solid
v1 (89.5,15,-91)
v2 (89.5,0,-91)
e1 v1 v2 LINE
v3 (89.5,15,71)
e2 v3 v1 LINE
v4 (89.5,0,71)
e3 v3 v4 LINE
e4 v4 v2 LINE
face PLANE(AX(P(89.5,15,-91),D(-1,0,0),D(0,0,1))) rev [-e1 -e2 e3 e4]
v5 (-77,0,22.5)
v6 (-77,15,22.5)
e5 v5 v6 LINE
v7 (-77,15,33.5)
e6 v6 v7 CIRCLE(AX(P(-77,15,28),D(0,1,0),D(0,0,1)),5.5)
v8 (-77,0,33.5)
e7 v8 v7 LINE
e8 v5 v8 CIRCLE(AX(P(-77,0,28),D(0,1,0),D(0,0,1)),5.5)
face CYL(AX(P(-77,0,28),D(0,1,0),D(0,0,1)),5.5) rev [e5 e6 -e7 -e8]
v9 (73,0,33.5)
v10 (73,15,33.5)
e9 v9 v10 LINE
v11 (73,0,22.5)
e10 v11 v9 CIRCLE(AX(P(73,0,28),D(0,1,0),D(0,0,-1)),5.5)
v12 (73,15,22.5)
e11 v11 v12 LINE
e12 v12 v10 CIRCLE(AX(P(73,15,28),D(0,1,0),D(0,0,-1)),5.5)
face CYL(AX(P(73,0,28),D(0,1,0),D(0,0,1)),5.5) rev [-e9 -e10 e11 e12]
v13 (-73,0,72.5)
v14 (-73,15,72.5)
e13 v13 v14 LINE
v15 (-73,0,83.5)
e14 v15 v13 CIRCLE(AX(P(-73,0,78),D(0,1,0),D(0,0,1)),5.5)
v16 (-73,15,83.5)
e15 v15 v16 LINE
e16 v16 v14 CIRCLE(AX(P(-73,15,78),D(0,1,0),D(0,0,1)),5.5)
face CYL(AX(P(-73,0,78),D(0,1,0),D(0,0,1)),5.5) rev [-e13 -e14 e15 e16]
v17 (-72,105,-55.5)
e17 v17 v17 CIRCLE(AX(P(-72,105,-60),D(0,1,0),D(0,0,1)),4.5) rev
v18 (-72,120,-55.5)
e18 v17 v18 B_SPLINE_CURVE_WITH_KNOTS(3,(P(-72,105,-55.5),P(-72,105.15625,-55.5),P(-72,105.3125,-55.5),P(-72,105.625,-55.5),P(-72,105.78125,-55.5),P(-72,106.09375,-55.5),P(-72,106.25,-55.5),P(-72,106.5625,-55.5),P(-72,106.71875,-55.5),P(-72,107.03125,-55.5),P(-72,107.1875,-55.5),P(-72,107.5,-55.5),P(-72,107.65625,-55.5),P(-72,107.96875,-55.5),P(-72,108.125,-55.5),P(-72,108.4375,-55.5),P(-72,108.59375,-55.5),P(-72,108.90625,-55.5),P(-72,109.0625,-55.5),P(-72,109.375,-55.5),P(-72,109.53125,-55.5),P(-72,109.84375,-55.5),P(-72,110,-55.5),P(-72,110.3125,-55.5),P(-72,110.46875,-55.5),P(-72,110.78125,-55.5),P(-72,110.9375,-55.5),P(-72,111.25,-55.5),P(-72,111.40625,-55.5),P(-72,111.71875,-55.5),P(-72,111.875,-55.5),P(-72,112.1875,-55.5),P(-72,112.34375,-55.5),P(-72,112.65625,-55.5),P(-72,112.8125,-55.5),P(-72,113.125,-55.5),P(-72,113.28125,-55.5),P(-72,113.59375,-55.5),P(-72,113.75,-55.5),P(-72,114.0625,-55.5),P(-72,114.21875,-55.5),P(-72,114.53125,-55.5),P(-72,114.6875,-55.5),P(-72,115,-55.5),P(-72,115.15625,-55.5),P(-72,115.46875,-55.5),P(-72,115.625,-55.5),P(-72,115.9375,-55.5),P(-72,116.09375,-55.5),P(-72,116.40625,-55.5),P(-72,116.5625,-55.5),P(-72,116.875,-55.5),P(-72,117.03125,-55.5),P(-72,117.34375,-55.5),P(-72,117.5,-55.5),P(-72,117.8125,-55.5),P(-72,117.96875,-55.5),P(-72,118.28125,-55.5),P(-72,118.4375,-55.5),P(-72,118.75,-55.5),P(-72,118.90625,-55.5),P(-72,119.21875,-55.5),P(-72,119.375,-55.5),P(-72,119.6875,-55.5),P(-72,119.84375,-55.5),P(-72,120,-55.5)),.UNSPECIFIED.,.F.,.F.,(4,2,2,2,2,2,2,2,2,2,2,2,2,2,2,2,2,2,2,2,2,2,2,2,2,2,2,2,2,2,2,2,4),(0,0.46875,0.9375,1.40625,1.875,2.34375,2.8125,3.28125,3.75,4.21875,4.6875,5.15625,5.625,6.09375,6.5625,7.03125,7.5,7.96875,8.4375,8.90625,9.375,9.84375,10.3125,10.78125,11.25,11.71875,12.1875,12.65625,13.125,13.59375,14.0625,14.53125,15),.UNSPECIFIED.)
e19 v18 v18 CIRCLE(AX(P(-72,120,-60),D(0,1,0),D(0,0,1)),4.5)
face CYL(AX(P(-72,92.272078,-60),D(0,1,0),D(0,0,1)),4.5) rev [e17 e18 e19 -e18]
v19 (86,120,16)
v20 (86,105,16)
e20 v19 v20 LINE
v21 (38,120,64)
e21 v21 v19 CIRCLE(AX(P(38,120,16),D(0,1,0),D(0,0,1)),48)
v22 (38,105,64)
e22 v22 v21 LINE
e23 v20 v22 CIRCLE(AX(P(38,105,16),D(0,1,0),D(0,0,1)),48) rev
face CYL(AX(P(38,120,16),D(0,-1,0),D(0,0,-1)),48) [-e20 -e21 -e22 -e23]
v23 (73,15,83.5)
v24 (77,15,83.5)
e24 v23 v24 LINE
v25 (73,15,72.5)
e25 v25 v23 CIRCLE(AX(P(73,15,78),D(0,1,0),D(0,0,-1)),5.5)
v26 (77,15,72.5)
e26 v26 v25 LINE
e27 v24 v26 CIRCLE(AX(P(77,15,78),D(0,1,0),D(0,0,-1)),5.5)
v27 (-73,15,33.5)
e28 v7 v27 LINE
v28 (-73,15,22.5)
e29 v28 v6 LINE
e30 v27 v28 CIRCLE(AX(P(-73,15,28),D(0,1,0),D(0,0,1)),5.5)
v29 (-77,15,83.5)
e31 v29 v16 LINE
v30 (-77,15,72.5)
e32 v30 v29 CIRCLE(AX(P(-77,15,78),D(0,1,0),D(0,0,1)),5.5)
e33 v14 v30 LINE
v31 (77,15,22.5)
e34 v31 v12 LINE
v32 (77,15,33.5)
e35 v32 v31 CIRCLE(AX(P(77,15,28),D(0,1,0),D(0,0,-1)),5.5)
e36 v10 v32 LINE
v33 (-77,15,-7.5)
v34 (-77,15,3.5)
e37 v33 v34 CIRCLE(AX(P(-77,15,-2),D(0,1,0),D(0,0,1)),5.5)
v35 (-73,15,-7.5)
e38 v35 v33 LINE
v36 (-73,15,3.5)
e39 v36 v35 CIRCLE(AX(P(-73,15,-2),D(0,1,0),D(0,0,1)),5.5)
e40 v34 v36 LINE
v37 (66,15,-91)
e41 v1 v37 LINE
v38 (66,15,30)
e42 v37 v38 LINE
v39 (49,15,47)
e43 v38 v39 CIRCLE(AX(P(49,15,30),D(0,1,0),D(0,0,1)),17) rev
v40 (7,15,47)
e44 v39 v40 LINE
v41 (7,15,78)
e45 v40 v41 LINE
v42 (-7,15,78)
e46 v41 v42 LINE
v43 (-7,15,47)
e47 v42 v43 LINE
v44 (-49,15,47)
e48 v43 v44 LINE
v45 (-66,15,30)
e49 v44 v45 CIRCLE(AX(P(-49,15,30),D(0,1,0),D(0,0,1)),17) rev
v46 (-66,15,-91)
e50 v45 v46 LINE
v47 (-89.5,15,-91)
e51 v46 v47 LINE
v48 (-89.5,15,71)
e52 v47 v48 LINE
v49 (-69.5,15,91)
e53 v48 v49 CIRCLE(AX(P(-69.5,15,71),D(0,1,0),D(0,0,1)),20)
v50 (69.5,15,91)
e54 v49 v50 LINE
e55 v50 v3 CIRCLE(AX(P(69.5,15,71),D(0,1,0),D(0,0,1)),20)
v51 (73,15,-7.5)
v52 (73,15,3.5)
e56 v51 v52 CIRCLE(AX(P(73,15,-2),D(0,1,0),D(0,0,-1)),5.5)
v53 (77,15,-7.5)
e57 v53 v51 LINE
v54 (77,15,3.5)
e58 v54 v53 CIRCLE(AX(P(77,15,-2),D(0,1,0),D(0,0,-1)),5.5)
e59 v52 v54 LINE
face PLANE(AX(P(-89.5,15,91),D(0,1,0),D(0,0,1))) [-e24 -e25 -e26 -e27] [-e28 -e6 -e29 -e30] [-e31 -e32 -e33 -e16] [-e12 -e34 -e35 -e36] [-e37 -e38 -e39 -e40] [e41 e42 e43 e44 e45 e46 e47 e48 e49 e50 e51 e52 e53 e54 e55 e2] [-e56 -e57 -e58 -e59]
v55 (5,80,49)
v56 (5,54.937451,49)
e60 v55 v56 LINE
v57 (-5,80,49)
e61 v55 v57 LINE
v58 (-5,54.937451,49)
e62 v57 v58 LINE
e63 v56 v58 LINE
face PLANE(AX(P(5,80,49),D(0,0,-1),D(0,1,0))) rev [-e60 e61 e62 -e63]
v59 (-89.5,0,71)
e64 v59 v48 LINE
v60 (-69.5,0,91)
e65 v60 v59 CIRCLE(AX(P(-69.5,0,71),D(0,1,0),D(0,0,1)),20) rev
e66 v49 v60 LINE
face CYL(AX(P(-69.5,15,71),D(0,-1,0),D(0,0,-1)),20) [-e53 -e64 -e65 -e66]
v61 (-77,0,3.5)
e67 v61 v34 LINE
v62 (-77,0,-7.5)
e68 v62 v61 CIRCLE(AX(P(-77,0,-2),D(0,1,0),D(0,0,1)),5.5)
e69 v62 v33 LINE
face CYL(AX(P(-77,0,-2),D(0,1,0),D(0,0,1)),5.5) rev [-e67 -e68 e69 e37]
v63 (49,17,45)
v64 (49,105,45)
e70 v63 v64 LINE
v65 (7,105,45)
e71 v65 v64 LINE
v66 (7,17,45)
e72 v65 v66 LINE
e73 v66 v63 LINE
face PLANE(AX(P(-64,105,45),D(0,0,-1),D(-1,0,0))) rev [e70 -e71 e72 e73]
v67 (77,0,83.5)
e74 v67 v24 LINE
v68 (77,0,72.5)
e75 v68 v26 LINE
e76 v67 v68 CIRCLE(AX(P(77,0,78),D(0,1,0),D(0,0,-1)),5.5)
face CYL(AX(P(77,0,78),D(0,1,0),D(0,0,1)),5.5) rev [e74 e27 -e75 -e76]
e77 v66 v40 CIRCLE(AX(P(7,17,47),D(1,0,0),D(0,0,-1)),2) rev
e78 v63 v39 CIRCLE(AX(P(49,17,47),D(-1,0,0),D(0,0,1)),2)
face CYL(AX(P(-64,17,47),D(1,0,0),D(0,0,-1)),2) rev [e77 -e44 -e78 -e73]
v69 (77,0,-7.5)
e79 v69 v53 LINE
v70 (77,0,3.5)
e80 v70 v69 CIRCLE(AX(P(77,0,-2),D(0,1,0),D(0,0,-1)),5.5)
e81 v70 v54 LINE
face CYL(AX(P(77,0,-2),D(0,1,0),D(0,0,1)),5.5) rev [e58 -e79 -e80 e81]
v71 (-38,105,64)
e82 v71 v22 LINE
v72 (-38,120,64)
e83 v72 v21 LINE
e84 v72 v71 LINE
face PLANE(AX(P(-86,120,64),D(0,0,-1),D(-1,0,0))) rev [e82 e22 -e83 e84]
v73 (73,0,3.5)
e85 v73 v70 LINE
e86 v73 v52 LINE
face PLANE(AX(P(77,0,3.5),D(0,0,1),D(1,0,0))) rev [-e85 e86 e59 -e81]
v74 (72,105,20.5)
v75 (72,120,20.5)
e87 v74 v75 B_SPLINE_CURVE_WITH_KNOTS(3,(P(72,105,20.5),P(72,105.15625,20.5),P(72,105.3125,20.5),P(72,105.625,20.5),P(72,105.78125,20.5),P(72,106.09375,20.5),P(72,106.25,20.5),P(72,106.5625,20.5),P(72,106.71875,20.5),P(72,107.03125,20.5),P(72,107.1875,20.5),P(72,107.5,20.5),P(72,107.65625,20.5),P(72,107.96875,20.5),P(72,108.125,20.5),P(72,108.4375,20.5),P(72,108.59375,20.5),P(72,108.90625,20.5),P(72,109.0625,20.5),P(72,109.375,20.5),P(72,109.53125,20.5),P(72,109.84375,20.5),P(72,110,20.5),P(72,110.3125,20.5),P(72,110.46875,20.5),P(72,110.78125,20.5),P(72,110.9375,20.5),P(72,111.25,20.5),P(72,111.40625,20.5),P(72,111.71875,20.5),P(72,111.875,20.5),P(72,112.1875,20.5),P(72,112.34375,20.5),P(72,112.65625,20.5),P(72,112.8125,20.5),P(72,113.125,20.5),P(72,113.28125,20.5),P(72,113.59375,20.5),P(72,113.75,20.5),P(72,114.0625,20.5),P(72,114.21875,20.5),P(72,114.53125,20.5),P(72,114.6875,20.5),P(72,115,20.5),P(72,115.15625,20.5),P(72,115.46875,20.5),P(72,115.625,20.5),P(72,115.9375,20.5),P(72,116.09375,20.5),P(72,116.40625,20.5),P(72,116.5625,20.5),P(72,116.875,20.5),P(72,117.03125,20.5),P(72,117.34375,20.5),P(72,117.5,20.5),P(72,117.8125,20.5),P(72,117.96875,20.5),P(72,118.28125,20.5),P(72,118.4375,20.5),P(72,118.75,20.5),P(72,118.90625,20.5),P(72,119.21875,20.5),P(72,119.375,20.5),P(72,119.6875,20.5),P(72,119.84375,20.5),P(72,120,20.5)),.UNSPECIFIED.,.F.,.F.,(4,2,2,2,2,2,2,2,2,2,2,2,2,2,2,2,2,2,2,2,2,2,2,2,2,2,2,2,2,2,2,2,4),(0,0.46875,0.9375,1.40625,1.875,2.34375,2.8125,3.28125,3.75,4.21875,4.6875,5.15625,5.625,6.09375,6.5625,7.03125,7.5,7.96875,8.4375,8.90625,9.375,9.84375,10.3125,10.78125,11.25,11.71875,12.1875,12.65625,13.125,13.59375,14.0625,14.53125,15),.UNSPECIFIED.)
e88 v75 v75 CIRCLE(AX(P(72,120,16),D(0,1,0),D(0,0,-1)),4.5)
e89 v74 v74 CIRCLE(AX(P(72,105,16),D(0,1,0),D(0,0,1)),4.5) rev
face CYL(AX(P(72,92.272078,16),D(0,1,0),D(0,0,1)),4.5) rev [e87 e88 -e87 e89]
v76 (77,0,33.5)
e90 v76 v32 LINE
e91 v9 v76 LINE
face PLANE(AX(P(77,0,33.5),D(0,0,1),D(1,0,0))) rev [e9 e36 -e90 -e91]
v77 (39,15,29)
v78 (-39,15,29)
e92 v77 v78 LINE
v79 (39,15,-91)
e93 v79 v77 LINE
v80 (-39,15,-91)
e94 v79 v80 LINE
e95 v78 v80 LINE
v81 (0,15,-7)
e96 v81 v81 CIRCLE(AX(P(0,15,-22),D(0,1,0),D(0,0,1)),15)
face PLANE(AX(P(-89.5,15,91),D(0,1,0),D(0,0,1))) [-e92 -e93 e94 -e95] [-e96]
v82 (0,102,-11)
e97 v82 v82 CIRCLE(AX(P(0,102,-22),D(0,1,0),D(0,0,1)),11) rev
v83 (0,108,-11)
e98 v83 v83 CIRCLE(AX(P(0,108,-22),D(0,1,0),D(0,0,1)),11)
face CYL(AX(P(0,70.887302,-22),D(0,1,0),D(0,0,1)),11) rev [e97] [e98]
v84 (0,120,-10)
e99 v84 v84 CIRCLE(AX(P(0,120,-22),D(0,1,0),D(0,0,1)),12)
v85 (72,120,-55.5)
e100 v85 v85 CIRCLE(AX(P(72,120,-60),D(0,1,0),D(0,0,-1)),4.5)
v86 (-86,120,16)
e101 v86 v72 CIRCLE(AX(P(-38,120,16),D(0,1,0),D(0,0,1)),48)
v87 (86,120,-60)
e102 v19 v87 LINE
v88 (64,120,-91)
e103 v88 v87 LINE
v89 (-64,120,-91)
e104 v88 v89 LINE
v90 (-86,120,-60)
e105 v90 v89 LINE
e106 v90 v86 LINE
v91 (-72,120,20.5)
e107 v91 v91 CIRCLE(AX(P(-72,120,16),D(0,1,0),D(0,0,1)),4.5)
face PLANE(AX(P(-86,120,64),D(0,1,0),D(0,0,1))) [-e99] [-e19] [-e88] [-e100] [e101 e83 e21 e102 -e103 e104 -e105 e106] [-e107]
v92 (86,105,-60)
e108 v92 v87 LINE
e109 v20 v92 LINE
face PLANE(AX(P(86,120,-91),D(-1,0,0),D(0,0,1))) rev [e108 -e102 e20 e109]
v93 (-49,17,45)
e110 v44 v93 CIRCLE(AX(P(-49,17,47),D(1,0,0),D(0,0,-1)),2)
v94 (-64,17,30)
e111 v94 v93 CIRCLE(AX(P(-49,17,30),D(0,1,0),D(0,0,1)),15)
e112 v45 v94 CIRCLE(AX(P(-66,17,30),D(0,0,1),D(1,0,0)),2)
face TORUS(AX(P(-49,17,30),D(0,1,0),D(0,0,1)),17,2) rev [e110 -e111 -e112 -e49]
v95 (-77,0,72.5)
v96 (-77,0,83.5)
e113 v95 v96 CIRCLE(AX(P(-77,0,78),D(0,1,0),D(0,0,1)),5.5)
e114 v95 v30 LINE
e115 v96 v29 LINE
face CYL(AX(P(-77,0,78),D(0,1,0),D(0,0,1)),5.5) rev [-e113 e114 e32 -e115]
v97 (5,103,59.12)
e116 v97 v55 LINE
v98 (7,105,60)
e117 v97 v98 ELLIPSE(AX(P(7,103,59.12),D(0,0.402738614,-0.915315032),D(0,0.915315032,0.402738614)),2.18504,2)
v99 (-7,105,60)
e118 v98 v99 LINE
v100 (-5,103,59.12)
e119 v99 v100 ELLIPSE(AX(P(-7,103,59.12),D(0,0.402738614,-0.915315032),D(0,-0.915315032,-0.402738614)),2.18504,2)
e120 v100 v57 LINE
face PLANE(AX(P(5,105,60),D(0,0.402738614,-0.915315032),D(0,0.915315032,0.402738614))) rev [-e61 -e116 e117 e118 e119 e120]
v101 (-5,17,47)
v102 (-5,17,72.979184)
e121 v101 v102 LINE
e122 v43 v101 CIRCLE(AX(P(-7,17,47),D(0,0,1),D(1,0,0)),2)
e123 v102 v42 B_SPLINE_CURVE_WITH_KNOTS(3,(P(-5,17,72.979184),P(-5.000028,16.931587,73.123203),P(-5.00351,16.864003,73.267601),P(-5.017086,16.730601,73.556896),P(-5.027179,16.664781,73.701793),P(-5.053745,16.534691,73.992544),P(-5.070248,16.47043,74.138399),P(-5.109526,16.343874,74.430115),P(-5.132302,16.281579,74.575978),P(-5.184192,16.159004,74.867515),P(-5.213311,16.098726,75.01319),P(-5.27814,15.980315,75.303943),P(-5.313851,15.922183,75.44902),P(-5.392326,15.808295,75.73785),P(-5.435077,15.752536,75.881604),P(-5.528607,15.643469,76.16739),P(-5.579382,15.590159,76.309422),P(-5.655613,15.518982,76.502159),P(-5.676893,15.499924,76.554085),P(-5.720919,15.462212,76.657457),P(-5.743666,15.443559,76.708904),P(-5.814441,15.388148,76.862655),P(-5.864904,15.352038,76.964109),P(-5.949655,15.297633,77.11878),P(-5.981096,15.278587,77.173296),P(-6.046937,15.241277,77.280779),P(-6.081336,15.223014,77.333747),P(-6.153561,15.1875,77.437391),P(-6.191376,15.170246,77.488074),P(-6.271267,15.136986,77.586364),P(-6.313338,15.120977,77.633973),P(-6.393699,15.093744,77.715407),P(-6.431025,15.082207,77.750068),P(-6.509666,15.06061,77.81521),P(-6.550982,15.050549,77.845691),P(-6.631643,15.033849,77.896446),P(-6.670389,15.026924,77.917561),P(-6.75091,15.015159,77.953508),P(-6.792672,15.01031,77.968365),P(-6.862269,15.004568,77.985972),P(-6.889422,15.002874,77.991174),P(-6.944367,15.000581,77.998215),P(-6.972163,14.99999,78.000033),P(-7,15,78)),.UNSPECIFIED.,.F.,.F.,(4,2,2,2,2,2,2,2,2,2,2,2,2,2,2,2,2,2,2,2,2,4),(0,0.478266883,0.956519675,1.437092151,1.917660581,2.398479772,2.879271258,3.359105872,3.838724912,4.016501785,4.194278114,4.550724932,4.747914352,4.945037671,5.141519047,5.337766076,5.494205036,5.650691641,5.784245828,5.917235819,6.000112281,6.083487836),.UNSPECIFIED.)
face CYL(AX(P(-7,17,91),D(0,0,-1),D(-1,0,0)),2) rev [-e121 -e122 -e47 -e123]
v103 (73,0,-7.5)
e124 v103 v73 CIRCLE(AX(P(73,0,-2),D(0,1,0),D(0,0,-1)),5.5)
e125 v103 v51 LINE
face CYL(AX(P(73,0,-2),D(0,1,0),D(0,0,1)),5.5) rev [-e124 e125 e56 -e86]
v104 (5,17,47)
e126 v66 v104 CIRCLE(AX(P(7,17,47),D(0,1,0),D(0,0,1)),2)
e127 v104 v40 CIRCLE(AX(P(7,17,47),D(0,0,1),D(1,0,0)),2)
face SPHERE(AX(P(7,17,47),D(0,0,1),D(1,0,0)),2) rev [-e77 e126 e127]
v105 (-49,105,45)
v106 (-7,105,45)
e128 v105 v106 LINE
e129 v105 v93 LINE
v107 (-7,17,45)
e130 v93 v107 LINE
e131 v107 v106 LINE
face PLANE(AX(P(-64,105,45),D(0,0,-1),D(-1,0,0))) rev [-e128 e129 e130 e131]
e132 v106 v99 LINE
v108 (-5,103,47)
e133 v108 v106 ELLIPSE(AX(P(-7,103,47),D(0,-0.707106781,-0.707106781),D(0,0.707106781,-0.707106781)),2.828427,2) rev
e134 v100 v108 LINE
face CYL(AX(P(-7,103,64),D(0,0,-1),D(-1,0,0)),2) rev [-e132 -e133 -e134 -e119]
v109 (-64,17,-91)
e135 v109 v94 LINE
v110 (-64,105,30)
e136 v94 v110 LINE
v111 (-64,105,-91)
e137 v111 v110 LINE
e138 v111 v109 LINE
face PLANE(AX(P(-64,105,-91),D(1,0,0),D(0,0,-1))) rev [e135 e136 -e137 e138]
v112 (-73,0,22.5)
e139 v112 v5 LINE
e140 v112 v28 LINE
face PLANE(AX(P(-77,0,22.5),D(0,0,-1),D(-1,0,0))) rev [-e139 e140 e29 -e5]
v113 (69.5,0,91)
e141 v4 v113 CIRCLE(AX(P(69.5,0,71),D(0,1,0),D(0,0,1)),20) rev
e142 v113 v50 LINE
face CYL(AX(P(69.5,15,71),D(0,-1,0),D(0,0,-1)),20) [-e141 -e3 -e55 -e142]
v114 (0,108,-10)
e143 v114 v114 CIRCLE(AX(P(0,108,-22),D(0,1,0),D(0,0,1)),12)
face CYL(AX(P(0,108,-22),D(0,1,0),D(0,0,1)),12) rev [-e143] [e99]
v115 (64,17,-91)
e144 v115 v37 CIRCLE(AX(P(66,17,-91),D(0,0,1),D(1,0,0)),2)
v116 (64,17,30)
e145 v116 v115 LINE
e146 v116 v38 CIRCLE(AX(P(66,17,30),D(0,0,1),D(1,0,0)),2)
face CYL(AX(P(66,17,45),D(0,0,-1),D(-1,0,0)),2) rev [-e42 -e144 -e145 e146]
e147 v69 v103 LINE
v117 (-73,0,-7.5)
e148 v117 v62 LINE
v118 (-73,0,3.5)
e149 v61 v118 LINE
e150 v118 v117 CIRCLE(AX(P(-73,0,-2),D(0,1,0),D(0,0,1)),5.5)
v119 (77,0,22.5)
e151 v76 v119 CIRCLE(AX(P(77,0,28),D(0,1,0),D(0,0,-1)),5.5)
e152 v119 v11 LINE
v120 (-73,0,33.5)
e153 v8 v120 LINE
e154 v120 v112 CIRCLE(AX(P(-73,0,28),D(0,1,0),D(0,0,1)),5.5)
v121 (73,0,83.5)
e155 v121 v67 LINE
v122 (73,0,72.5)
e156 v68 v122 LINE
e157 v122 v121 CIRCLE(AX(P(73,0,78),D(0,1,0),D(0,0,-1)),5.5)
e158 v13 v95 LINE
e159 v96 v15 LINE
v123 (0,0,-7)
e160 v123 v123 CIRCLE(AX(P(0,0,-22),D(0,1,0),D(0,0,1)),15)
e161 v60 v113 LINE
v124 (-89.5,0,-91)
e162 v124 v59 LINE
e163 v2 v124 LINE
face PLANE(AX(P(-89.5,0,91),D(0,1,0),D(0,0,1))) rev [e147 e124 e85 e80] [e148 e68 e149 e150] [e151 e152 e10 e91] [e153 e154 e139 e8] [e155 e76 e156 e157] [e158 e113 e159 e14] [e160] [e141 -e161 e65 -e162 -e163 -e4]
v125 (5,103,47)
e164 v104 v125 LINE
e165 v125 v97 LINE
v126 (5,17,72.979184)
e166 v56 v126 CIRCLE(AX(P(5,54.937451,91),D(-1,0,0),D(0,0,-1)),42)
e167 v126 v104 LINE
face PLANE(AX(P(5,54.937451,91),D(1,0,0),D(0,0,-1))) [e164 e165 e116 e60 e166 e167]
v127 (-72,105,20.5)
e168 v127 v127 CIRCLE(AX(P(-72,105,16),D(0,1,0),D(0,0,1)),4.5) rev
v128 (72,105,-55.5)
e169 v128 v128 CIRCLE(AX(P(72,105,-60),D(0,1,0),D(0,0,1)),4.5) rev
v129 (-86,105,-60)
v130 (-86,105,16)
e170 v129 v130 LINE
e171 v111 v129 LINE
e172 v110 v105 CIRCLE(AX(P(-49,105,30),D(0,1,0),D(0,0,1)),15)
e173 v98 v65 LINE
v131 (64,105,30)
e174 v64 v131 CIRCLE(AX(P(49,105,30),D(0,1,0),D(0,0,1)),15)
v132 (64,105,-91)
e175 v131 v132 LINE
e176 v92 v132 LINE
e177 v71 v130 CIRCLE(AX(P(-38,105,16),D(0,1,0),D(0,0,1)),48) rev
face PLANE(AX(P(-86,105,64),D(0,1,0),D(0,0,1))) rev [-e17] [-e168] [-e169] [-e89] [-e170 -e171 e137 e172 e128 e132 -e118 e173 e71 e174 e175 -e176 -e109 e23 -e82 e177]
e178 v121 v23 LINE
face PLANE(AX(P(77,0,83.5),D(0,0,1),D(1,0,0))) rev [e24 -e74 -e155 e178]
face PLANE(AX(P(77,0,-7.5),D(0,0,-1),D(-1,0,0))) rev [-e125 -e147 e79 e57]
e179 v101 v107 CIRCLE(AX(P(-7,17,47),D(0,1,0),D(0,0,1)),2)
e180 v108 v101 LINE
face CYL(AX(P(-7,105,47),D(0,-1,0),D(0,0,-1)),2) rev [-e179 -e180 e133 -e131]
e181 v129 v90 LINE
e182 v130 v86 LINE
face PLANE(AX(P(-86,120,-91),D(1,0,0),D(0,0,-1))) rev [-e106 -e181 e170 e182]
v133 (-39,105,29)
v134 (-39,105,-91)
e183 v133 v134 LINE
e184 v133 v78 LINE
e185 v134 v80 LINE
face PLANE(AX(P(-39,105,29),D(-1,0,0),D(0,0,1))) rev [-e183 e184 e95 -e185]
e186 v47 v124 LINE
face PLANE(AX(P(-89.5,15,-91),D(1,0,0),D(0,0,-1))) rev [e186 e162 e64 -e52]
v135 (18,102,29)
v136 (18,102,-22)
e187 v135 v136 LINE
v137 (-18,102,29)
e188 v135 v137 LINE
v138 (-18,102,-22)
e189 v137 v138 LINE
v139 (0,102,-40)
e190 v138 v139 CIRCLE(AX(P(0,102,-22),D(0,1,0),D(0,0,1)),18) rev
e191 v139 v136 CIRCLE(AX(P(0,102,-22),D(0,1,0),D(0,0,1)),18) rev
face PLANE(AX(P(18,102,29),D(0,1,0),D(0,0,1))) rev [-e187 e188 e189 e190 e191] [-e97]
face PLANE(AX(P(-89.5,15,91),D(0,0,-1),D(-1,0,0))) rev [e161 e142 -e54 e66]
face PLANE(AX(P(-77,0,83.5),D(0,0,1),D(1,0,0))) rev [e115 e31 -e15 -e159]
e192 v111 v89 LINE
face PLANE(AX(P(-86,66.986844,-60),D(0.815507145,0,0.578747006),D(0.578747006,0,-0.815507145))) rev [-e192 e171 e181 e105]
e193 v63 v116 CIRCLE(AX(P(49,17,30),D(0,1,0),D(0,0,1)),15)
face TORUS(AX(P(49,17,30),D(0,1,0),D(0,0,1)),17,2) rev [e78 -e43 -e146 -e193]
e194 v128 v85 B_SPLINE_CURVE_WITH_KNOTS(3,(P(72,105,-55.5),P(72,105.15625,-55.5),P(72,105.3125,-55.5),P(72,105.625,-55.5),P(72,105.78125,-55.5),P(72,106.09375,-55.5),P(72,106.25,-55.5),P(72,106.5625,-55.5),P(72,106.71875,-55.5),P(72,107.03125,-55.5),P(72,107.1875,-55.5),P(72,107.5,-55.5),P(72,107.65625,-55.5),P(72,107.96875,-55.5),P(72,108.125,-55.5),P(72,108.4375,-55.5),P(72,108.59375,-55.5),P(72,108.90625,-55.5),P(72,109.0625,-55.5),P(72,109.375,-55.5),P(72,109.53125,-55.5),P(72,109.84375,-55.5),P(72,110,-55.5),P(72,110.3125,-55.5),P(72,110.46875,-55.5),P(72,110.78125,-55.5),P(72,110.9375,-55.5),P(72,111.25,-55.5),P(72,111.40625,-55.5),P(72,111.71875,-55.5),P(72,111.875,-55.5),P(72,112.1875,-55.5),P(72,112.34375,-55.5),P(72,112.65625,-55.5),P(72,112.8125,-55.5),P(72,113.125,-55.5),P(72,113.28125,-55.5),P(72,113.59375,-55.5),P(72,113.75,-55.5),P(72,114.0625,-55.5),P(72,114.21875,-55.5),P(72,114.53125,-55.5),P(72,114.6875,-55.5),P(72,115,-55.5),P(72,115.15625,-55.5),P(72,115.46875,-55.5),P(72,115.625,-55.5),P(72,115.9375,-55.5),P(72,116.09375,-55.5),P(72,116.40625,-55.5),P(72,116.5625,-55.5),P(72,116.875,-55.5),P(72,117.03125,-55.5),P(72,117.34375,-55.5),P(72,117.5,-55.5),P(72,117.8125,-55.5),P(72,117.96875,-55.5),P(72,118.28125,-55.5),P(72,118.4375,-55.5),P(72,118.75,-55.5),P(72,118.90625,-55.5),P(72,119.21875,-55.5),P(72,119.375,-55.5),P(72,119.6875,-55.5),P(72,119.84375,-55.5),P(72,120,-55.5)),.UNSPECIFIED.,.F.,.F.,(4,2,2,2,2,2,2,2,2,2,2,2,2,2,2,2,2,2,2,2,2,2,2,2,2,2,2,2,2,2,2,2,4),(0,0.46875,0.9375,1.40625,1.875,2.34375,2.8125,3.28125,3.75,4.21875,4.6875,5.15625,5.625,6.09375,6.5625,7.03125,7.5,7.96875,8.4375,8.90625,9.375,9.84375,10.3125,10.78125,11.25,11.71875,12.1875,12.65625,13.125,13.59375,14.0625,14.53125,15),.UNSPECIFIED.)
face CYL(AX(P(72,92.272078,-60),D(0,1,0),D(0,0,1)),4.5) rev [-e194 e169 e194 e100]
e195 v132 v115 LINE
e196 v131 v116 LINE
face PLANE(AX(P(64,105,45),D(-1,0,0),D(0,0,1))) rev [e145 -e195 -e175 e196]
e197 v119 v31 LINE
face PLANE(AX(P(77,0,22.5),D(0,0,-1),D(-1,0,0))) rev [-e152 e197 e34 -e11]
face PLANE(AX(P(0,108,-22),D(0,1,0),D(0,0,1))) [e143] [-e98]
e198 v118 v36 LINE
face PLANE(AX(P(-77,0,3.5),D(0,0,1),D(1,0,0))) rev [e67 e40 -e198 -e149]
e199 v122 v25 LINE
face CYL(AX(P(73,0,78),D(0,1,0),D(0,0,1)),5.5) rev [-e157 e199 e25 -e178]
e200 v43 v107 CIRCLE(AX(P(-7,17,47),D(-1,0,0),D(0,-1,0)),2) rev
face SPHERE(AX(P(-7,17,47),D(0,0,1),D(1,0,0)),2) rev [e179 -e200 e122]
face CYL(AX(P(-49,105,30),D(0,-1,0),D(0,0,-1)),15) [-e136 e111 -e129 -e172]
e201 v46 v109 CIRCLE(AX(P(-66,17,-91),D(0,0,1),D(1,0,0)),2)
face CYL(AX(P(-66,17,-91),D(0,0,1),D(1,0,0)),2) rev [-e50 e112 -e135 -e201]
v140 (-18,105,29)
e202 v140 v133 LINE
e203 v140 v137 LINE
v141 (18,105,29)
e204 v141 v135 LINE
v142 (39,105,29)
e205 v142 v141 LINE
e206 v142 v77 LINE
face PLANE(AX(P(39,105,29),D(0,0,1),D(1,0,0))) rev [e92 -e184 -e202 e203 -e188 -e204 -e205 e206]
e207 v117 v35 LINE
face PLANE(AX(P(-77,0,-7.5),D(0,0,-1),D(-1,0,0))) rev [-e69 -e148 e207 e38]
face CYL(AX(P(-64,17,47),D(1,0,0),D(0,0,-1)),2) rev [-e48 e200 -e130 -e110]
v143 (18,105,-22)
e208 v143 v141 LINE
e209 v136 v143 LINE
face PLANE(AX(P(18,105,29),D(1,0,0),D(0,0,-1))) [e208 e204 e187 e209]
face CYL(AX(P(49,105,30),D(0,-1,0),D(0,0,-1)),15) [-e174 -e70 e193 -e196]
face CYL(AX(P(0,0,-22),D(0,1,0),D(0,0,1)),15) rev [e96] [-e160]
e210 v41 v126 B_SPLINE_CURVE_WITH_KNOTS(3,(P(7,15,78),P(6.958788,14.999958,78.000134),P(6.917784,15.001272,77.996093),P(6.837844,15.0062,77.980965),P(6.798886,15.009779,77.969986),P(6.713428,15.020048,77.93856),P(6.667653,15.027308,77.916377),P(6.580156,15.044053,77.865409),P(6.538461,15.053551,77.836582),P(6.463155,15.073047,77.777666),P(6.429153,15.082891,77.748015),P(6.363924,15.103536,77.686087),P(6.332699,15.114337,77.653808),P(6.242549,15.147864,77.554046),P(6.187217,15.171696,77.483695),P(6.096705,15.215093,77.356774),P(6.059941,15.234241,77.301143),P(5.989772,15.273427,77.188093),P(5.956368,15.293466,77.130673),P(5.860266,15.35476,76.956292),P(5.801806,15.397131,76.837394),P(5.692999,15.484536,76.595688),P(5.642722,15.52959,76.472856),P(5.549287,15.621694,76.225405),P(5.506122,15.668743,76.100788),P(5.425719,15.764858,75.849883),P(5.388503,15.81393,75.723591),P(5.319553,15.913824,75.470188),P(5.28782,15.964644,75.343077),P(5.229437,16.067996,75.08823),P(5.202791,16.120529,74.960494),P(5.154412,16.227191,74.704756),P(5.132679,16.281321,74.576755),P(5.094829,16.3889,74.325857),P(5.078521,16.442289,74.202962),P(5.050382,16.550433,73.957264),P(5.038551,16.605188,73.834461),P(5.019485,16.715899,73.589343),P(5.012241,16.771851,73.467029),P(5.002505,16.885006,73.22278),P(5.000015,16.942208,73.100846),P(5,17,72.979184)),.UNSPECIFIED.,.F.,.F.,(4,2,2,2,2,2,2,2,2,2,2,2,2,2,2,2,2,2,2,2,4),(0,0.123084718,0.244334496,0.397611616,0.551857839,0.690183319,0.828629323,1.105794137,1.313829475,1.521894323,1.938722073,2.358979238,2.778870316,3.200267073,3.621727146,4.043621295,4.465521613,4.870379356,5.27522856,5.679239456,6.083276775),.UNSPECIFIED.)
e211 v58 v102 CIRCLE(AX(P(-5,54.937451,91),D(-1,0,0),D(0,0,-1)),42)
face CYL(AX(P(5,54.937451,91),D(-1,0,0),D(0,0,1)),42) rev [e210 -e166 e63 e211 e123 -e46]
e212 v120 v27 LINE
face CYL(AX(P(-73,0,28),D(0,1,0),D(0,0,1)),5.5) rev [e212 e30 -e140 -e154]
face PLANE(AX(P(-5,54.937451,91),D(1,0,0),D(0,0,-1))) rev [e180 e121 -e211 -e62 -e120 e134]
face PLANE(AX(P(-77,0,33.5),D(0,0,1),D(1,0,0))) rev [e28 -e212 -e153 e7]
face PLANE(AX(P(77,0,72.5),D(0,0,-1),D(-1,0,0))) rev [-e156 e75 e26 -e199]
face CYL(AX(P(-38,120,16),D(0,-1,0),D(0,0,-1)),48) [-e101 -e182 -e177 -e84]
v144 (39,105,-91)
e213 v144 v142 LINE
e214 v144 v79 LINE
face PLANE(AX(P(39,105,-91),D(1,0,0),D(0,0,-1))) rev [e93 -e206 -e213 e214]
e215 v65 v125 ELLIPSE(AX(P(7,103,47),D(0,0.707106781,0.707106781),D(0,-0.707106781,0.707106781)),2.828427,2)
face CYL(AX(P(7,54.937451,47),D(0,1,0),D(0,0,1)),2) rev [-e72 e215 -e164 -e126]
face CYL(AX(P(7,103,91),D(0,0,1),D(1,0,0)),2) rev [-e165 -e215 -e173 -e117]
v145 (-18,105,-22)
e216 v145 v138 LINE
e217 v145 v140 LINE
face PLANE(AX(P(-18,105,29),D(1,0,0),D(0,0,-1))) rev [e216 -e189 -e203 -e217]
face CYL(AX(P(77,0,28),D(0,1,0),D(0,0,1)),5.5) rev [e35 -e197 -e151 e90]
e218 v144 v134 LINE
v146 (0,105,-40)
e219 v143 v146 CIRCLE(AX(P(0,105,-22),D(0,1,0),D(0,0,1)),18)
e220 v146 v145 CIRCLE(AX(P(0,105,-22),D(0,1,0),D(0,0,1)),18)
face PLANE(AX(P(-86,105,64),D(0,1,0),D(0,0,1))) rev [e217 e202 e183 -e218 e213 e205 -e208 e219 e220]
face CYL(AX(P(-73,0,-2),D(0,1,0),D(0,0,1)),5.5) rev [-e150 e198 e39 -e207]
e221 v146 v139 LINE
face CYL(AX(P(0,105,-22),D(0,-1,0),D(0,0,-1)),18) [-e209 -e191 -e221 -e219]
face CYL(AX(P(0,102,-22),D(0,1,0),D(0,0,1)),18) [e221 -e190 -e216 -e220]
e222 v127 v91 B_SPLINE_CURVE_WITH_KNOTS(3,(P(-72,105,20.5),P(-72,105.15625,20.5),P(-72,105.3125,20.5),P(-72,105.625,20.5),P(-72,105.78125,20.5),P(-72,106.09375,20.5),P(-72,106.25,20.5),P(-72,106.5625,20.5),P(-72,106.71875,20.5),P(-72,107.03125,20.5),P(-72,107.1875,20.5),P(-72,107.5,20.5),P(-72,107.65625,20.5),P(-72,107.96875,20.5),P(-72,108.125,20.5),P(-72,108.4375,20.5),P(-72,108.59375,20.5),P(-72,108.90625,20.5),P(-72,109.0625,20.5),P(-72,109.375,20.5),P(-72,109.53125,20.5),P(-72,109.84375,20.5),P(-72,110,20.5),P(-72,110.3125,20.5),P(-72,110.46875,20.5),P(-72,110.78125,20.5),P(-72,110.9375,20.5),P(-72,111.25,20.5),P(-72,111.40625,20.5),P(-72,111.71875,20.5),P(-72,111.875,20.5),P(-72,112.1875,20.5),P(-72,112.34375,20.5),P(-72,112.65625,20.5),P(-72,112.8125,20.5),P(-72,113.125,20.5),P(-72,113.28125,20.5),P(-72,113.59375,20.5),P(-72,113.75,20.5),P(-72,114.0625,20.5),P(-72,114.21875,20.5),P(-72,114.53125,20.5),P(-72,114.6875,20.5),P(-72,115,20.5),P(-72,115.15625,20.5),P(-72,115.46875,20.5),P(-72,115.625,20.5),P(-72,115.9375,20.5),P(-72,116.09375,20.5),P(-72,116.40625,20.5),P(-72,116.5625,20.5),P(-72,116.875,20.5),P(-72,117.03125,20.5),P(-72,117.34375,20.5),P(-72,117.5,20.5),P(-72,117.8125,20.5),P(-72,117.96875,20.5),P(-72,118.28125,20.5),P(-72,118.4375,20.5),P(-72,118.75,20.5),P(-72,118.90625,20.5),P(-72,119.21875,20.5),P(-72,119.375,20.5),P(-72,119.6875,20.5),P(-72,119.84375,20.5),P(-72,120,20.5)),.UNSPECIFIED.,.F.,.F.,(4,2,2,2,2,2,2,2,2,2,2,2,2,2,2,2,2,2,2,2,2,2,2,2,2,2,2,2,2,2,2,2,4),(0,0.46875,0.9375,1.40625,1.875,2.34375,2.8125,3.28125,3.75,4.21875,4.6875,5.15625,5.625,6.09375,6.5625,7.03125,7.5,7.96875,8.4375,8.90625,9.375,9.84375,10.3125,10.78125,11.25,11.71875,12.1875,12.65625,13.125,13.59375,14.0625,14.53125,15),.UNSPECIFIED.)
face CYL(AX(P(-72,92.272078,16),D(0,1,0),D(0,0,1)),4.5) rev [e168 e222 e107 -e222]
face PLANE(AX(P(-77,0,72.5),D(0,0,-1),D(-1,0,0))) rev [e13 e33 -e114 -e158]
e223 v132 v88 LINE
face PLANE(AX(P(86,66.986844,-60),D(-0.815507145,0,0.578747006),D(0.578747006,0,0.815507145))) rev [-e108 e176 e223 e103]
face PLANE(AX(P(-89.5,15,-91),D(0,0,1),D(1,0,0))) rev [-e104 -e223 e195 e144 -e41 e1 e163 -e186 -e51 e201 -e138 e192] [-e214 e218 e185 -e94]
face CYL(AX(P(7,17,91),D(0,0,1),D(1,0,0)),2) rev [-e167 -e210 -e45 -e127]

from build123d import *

# Parameters (mm, degrees)
SKETCH_1_W          = 179
SKETCH_1_H          = 182
EXTRUDE_1_DEPTH     = 15
SKETCH_2_R          = 15
CUT_EXTRUDE_1_DEPTH = 129.51556326
CUT_EXTRUDE_3_DEPTH = 129.51556326
FILLET_1_R          = 20
EXTRUDE_2_DEPTH     = 90
FILLET_2_R          = 15
EXTRUDE_3_DEPTH     = 5
SKETCH_7_W          = 172
SKETCH_7_H          = 155
EXTRUDE_4_DEPTH     = 15
CUT_EXTRUDE_4_DEPTH = 15
FILLET_3_R          = 48
SKETCH_9_R          = 4.5
CUT_EXTRUDE_5_DEPTH = 15
SKETCH_11_W         = 69
SKETCH_11_H         = 3
EXTRUDE_5_DEPTH     = 18
FILLET_4_R          = 18
SKETCH_12_R         = 12
CUT_EXTRUDE_6_DEPTH = 12
SKETCH_13_R         = 11
CUT_EXTRUDE_7_DEPTH = 6
FILLET_5_R          = 2


with BuildPart() as part:
    # 草图1 → 凸台-拉伸1 (new body)
    with BuildSketch(Plane(origin=(0, 0, 0), x_dir=(1, 0, 0), z_dir=(0, 1, 0))):
        Rectangle(SKETCH_1_W, SKETCH_1_H)
    extrude(amount=EXTRUDE_1_DEPTH)

    # 草图2 → 切除-拉伸1 (cut, through all)
    with BuildSketch(Plane(origin=(0, 15, 0), x_dir=(1, 0, 0), z_dir=(0, 1, 0))):
        with Locations(Location((0, 22, 0), (0, 0, 270))):
            Circle(SKETCH_2_R)
    extrude(amount=-CUT_EXTRUDE_1_DEPTH, mode=Mode.SUBTRACT)

    # 草图4 → 切除-拉伸3 (cut, through all)
    with BuildSketch(Plane(origin=(0, 15, 0), x_dir=(1, 0, 0), z_dir=(0, 1, 0))):
        with BuildLine():
            Line((-77, -72.5), (-73, -72.5))
            ThreePointArc((-73, -72.5), (-67.5, -78), (-73, -83.5))
            Line((-73, -83.5), (-77, -83.5))
            ThreePointArc((-77, -83.5), (-82.5, -78), (-77, -72.5))
        make_face()
        with BuildLine():
            Line((-77, -22.5), (-73, -22.5))
            ThreePointArc((-73, -22.5), (-67.5, -28), (-73, -33.5))
            Line((-73, -33.5), (-77, -33.5))
            ThreePointArc((-77, -33.5), (-82.5, -28), (-77, -22.5))
        make_face()
        with BuildLine():
            Line((-77, 7.5), (-73, 7.5))
            ThreePointArc((-73, 7.5), (-67.5, 2), (-73, -3.5))
            Line((-73, -3.5), (-77, -3.5))
            ThreePointArc((-77, -3.5), (-82.5, 2), (-77, 7.5))
        make_face()
        with BuildLine():
            Line((77, 7.5), (73, 7.5))
            ThreePointArc((73, 7.5), (67.5, 2), (73, -3.5))
            Line((73, -3.5), (77, -3.5))
            ThreePointArc((77, -3.5), (82.5, 2), (77, 7.5))
        make_face()
        with BuildLine():
            Line((77, -22.5), (73, -22.5))
            ThreePointArc((73, -22.5), (67.5, -28), (73, -33.5))
            Line((73, -33.5), (77, -33.5))
            ThreePointArc((77, -33.5), (82.5, -28), (77, -22.5))
        make_face()
        with BuildLine():
            Line((77, -72.5), (73, -72.5))
            ThreePointArc((73, -72.5), (67.5, -78), (73, -83.5))
            Line((73, -83.5), (77, -83.5))
            ThreePointArc((77, -83.5), (82.5, -78), (77, -72.5))
        make_face()
    extrude(amount=-CUT_EXTRUDE_3_DEPTH, mode=Mode.SUBTRACT)

    # 圆角1
    fillet_1_edges = [part.edges().sort_by_distance(p)[0] for p in [
        (89.5, 7.5, 91),
        (-89.5, 7.5, 91),
    ]]
    fillet(fillet_1_edges, radius=FILLET_1_R)

    # 草图5 → 凸台-拉伸2 (add)
    with BuildSketch(Plane(origin=(0, 15, 0), x_dir=(1, 0, 0), z_dir=(0, 1, 0))):
        Polygon((-64, 91), (-64, -45), (64, -45), (64, 91), (39, 91), (39, -29), (-39, -29), (-39, 91), align=None)
    extrude(amount=EXTRUDE_2_DEPTH)

    # 圆角2
    fillet_2_edges = [part.edges().sort_by_distance(p)[0] for p in [
        (-64, 60, 45),
        (64, 60, 45),
    ]]
    fillet(fillet_2_edges, radius=FILLET_2_R)

    # 草图6 → 凸台-拉伸3 (add, symmetric)
    with BuildSketch(Plane(origin=(0, 0, 0), x_dir=(0, 0, -1), z_dir=(1, 0, 0))):
        with BuildLine():
            Line((-45, 105), (-60, 105))
            Line((-60, 105), (-49, 80))
            Line((-49, 80), (-49, 54.937451095))
            ThreePointArc((-49, 54.937451095), (-57.014709064, 30.259525737), (-78, 15))
            Line((-78, 15), (-45, 15))
            Line((-45, 15), (-45, 105))
        make_face()
    extrude(amount=EXTRUDE_3_DEPTH, both=True)

    # 草图7 → 凸台-拉伸4 (add)
    with BuildSketch(Plane(origin=(0, 105, 0), x_dir=(1, 0, 0), z_dir=(0, 1, 0))):
        with Locations((0, 13.5)):
            Rectangle(SKETCH_7_W, SKETCH_7_H)
    extrude(amount=EXTRUDE_4_DEPTH)

    # 草图8 → 切除-拉伸4 (cut)
    with BuildSketch(Plane(origin=(0, 120, 0), x_dir=(1, 0, 0), z_dir=(0, 1, 0))):
        Polygon((-86, 91), (-86, 60), (-64, 91), align=None)
        Polygon((64, 91), (86, 91), (86, 60), align=None)
    extrude(amount=-CUT_EXTRUDE_4_DEPTH, mode=Mode.SUBTRACT)

    # 圆角3
    fillet_3_edges = [part.edges().sort_by_distance(p)[0] for p in [
        (-86, 112.5, 64),
        (86, 112.5, 64),
    ]]
    fillet(fillet_3_edges, radius=FILLET_3_R)

    # 草图9 → 切除-拉伸5 (cut)
    with BuildSketch(Plane(origin=(0, 120, 0), x_dir=(1, 0, 0), z_dir=(0, 1, 0))):
        with Locations(Location((-72, 60, 0), (0, 0, 270))):
            Circle(SKETCH_9_R)
        with Locations(Location((-72, -16, 0), (0, 0, 270))):
            Circle(SKETCH_9_R)
        with Locations(Location((72, -16, 0), (0, 0, 270))):
            Circle(SKETCH_9_R)
        with Locations(Location((72, 60, 0), (0, 0, 270))):
            Circle(SKETCH_9_R)
    extrude(amount=-CUT_EXTRUDE_5_DEPTH, mode=Mode.SUBTRACT)

    # 草图11 → 凸台-拉伸5 (add, symmetric)
    with BuildSketch(Plane(origin=(0, 0, 0), x_dir=(0, 0, -1), z_dir=(1, 0, 0))):
        with Locations((5.5, 103.5)):
            Rectangle(SKETCH_11_W, SKETCH_11_H)
    extrude(amount=EXTRUDE_5_DEPTH, both=True)

    # 圆角4
    fillet_4_edges = [part.edges().sort_by_distance(p)[0] for p in [
        (-18, 103.5, -40),
        (18, 103.5, -40),
    ]]
    fillet(fillet_4_edges, radius=FILLET_4_R - 0.0001)  # a hair under: the kernel refuses the full size

    # 草图12 → 切除-拉伸6 (cut)
    with BuildSketch(Plane(origin=(0, 120, 0), x_dir=(1, 0, 0), z_dir=(0, 1, 0))):
        with Locations(Location((0, 22, 0), (0, 0, 270))):
            Circle(SKETCH_12_R)
    extrude(amount=-CUT_EXTRUDE_6_DEPTH, mode=Mode.SUBTRACT)

    # 草图13 → 切除-拉伸7 (cut)
    with BuildSketch(Plane(origin=(0, 108, 0), x_dir=(1, 0, 0), z_dir=(0, 1, 0))):
        with Locations(Location((0, 22, 0), (0, 0, 270))):
            Circle(SKETCH_13_R)
    extrude(amount=-CUT_EXTRUDE_7_DEPTH, mode=Mode.SUBTRACT)

    # 圆角5
    fillet_5_edges = [part.edges().sort_by_distance(p)[0] for p in [
        (-64, 15, -30.5),
        (64, 15, -30.5),
        (-27, 15, 45),
        (59.606601718, 15, 40.606601718),
        (-59.606601718, 15, 40.606601718),
        (27, 15, 45),
        (-5, 60, 45),
        (-5, 105, 52.5),
        (-5, 15, 61.5),
        (5, 60, 45),
        (5, 105, 52.5),
        (5, 15, 61.5),
    ]]
    fillet(fillet_5_edges, radius=FILLET_5_R)


solid = part.part
